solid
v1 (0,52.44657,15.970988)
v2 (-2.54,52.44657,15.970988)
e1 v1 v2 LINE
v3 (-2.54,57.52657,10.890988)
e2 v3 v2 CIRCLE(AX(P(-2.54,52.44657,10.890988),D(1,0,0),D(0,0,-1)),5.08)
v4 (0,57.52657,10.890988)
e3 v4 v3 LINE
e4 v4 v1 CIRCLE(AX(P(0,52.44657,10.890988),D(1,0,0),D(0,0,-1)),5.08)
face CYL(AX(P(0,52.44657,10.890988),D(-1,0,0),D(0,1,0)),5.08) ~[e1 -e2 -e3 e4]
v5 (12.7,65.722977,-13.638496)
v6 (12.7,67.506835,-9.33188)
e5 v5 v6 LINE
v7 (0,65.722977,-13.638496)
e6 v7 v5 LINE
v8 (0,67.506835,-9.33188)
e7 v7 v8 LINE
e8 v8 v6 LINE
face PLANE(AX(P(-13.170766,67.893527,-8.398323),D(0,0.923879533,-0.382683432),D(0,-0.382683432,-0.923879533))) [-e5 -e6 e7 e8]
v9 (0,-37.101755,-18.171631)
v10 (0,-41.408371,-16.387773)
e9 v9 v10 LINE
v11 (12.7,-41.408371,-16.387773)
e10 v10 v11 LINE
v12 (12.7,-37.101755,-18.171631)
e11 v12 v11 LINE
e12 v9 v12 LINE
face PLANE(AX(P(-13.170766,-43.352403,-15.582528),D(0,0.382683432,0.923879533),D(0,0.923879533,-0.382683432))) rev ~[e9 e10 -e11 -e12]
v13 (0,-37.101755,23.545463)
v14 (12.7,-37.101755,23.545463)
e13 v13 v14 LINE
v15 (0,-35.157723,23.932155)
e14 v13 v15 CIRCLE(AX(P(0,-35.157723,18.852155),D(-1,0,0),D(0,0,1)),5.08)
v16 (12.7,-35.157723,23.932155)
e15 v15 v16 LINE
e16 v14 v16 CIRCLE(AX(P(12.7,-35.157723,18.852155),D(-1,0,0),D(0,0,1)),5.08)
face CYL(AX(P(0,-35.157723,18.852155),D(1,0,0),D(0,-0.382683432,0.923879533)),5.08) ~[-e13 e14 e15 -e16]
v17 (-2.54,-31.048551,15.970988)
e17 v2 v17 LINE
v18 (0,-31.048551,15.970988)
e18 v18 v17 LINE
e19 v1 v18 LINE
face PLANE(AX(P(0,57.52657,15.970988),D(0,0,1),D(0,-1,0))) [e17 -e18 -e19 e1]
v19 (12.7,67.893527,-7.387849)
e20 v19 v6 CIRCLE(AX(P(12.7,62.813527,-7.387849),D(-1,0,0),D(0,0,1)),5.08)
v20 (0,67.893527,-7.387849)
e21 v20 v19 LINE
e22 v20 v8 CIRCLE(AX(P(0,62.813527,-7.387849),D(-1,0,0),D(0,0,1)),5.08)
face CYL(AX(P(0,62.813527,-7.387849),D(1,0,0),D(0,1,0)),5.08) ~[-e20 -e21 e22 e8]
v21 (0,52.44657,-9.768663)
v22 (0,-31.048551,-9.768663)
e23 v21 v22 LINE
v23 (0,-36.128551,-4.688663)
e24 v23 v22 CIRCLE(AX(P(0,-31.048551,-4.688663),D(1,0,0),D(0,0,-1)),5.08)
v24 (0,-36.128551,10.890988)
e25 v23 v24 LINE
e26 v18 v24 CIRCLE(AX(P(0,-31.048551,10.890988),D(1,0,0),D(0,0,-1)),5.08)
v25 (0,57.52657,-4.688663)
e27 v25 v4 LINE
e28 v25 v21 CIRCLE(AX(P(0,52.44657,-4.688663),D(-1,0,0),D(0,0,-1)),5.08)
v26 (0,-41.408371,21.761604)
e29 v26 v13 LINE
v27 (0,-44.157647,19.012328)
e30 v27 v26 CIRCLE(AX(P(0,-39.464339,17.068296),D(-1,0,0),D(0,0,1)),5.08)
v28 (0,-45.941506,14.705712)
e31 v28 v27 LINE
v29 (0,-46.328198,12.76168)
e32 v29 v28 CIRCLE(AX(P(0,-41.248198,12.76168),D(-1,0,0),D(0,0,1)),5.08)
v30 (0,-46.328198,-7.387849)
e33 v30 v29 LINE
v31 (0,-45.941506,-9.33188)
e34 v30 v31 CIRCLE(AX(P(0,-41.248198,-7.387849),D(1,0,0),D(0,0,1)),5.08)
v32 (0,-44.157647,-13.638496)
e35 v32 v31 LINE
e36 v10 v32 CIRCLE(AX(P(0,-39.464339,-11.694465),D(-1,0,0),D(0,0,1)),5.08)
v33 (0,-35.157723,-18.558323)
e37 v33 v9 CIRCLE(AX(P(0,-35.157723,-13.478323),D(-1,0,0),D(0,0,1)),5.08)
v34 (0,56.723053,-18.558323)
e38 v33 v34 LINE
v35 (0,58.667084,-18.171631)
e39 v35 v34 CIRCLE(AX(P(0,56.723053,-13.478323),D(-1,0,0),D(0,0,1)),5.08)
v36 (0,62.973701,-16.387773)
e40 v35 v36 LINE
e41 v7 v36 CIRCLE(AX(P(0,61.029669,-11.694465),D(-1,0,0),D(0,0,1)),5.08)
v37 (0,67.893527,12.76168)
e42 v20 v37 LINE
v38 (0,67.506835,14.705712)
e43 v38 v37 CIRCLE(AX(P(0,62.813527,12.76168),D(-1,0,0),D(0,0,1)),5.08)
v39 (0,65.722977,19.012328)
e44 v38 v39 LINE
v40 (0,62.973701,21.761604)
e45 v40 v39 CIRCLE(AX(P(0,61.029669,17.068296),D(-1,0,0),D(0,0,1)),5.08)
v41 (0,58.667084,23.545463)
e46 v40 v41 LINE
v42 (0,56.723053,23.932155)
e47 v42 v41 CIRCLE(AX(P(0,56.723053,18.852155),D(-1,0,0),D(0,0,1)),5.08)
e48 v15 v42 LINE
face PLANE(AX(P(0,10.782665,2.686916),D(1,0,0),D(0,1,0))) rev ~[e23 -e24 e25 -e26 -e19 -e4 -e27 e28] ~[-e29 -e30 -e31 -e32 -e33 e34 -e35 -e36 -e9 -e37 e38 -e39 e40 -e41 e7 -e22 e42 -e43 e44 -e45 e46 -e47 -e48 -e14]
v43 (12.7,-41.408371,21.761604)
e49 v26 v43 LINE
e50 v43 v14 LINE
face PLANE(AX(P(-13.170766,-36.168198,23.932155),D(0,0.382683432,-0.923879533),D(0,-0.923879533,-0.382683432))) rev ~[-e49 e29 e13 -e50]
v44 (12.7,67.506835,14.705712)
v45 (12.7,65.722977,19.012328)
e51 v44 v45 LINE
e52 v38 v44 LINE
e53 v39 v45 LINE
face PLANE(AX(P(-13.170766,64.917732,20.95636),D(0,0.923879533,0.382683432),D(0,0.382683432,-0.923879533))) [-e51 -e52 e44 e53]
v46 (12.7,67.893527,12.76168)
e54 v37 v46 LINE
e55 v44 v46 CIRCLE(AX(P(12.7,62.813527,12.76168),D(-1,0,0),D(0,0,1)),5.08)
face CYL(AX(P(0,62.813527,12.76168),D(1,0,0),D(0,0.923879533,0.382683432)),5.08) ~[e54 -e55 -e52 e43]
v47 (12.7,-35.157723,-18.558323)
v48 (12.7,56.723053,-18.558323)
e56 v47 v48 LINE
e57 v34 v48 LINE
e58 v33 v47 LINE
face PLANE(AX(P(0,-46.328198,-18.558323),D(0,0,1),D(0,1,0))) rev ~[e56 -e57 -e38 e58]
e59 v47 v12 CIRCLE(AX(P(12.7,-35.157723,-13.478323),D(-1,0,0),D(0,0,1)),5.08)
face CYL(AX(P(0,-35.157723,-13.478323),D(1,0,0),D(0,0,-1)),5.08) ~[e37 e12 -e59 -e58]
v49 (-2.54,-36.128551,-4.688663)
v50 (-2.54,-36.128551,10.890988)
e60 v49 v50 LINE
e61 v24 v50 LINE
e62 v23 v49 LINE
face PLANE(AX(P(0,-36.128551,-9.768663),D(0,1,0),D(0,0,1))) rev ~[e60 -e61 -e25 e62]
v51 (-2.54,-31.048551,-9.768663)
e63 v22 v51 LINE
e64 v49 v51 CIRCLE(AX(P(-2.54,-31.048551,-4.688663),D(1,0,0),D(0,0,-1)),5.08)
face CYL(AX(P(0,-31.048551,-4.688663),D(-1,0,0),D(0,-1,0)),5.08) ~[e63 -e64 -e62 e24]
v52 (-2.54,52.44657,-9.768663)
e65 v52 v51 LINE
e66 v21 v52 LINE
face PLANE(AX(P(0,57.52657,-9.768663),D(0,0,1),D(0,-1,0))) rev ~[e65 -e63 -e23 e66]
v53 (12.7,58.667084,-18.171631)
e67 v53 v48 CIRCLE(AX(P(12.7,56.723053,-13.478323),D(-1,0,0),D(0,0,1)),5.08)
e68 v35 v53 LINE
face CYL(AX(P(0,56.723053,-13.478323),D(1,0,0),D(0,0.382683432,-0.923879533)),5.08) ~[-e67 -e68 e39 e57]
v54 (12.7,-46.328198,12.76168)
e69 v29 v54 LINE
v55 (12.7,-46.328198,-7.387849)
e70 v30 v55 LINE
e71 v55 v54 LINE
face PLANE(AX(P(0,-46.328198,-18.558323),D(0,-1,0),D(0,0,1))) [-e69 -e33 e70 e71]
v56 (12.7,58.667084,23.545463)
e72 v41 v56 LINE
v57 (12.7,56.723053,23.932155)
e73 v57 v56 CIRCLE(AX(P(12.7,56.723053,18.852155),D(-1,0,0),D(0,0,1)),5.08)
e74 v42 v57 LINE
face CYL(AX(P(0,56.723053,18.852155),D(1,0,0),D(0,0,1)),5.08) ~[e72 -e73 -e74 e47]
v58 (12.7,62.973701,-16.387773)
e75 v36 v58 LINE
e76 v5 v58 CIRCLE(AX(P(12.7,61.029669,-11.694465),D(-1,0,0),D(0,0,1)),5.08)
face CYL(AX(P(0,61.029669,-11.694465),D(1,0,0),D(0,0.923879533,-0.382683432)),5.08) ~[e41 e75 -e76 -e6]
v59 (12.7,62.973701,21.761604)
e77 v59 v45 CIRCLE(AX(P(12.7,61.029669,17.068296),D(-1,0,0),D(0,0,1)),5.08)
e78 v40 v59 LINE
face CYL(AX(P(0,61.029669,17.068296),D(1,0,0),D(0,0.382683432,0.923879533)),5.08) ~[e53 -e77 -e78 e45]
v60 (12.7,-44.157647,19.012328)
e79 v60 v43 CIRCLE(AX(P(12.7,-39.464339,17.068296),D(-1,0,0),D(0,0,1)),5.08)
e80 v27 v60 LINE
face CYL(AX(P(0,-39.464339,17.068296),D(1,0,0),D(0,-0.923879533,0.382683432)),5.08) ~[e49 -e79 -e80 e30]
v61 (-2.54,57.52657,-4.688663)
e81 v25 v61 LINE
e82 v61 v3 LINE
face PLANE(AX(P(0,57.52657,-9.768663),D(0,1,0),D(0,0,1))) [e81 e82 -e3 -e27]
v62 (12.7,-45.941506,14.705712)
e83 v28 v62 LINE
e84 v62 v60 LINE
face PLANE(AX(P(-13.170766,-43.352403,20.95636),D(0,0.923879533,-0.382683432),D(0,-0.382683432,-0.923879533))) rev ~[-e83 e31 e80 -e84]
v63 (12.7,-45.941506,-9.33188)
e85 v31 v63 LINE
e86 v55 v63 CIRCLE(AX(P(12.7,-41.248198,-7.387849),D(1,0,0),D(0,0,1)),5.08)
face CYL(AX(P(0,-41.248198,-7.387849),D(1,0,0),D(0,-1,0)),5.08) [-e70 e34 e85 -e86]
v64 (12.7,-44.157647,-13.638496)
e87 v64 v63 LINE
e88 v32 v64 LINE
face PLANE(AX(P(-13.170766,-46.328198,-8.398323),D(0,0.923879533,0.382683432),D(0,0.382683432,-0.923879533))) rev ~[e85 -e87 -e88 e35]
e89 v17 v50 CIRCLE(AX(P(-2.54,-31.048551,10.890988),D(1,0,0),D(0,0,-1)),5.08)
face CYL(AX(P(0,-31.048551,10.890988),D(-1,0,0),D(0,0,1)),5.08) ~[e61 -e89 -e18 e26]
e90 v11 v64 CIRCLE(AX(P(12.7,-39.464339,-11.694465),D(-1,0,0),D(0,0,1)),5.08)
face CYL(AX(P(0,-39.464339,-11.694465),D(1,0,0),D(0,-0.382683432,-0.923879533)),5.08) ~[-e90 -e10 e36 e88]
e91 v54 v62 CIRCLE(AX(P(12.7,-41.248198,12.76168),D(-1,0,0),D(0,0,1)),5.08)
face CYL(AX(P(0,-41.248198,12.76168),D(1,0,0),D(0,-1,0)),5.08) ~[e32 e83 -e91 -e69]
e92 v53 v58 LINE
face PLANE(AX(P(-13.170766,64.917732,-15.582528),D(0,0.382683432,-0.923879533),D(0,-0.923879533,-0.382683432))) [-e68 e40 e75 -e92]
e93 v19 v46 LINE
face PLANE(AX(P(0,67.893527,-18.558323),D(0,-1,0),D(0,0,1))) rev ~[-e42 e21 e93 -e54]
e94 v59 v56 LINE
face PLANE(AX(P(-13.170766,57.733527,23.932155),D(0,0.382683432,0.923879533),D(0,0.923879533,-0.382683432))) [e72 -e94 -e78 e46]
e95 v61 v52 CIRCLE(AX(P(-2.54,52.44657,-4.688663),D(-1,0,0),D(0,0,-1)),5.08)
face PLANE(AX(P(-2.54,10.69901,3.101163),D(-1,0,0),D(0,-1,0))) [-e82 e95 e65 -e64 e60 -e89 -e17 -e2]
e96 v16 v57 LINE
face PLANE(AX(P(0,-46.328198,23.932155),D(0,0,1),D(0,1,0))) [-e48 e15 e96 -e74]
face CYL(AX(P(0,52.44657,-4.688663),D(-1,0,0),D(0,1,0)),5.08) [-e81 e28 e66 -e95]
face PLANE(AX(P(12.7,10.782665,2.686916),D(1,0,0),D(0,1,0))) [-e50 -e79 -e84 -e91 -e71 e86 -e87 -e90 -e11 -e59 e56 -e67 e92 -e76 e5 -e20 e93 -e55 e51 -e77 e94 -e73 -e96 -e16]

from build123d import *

# Parameters (mm, degrees)
F0_W        = 114.2217256129
F0_H        = 42.490478605
F1_DEPTH    = 12.7
F2_W        = 93.6551205814
F2_H        = 25.7396511734
F3_DEPTH    = 2.54
F4_R        = 5.08
F5_SIZE     = 5.08
F6_T1_DEPTH = 39.0415311919
F7_R        = 5.08


# Not quite as in the source:
# - a fillet or chamfer that OpenCascade refuses, or shapes differently, is made with other operations: its cross-section is extruded or revolved along the edge and cut away or added


with BuildPart() as f1:
    # F0 (on Right) → F1 (new body)
    with BuildSketch(Plane.YZ):
        with Locations((10.7826646417, 2.6869159192)):
            Rectangle(F0_W, F0_H)
    extrude(amount=F1_DEPTH)

    # F2 (on face) → F3 (join)
    with BuildSketch(Plane(origin=(0, 0, 0), x_dir=(0, -1, 0), z_dir=(-1, 0, 0))):
        with Locations((-10.6990095228, 3.1011626124)):
            Rectangle(F2_W, F2_H)
    extrude(amount=F3_DEPTH)

    # F4
    f4_edges = [f1.edges().sort_by_distance(p)[0] for p in [
        (-1.27, 57.52657, 15.970988),
        (-1.27, 57.52657, -9.768663),
        (-1.27, -36.128551, -9.768663),
        (-1.27, -36.128551, 15.970988),
    ]]
    fillet(f4_edges, radius=F4_R)

    # F5
    f5_edges = [f1.edges().sort_by_distance(p)[0] for p in [
        (6.35, 67.893527, 23.932155),
        (6.35, -46.328198, 23.932155),
        (6.35, 67.893527, -18.558323),
        (6.35, -46.328198, -18.558323),
    ]]
    chamfer(f5_edges, length=F5_SIZE)

    # F6: chamfer of 5.08 on 8 edges, made by hand

    # F6_s2 → F6_t1 (cut)
    with BuildSketch(Plane.YZ.offset(-13.170765596)):
        Polygon((64.3014249997, 22.4442576701), (67.8935274482, 13.7721552217), (67.8935274482, 18.8521552217), align=None)
        Polygon((57.7335274482, 23.9321552217), (66.4056298966, 20.3400527733), (62.8135274482, 23.9321552217), align=None)
        Polygon((66.4056298966, -14.9662209349), (57.7335274482, -18.5583233833), (62.8135274482, -18.5583233833), align=None)
        Polygon((67.8935274482, -8.3983233833), (64.3014249997, -17.0704258318), (67.8935274482, -13.4783233833), align=None)
        Polygon((-44.8403006131, -14.9662209349), (-36.1681981647, -18.5583233833), (-41.2481981647, -18.5583233833), align=None)
        Polygon((-46.3281981647, -8.3983233833), (-42.7360957163, -17.0704258318), (-46.3281981647, -13.4783233833), align=None)
        Polygon((-42.7360957163, 22.4442576701), (-46.3281981647, 13.7721552217), (-46.3281981647, 18.8521552217), align=None)
        Polygon((-36.1681981647, 23.9321552217), (-44.8403006131, 20.3400527733), (-41.2481981647, 23.9321552217), align=None)
    extrude(amount=F6_T1_DEPTH, mode=Mode.SUBTRACT)

    # F7
    f7_edges = [f1.edges().sort_by_distance(p)[0] for p in [
        (6.35, -43.352403, -15.582528),
        (6.35, -46.328198, -8.398323),
        (6.35, -36.168198, -18.558323),
        (6.35, -46.328198, 13.772155),
        (6.35, -43.352403, 20.95636),
        (6.35, -36.168198, 23.932155),
        (6.35, 57.733527, 23.932155),
        (6.35, 64.917732, 20.95636),
        (6.35, 67.893527, 13.772155),
        (6.35, 67.893527, -8.398323),
        (6.35, 64.917732, -15.582528),
        (6.35, 57.733527, -18.558323),
    ]]
    fillet(f7_edges, radius=F7_R)


solid = f1.part
